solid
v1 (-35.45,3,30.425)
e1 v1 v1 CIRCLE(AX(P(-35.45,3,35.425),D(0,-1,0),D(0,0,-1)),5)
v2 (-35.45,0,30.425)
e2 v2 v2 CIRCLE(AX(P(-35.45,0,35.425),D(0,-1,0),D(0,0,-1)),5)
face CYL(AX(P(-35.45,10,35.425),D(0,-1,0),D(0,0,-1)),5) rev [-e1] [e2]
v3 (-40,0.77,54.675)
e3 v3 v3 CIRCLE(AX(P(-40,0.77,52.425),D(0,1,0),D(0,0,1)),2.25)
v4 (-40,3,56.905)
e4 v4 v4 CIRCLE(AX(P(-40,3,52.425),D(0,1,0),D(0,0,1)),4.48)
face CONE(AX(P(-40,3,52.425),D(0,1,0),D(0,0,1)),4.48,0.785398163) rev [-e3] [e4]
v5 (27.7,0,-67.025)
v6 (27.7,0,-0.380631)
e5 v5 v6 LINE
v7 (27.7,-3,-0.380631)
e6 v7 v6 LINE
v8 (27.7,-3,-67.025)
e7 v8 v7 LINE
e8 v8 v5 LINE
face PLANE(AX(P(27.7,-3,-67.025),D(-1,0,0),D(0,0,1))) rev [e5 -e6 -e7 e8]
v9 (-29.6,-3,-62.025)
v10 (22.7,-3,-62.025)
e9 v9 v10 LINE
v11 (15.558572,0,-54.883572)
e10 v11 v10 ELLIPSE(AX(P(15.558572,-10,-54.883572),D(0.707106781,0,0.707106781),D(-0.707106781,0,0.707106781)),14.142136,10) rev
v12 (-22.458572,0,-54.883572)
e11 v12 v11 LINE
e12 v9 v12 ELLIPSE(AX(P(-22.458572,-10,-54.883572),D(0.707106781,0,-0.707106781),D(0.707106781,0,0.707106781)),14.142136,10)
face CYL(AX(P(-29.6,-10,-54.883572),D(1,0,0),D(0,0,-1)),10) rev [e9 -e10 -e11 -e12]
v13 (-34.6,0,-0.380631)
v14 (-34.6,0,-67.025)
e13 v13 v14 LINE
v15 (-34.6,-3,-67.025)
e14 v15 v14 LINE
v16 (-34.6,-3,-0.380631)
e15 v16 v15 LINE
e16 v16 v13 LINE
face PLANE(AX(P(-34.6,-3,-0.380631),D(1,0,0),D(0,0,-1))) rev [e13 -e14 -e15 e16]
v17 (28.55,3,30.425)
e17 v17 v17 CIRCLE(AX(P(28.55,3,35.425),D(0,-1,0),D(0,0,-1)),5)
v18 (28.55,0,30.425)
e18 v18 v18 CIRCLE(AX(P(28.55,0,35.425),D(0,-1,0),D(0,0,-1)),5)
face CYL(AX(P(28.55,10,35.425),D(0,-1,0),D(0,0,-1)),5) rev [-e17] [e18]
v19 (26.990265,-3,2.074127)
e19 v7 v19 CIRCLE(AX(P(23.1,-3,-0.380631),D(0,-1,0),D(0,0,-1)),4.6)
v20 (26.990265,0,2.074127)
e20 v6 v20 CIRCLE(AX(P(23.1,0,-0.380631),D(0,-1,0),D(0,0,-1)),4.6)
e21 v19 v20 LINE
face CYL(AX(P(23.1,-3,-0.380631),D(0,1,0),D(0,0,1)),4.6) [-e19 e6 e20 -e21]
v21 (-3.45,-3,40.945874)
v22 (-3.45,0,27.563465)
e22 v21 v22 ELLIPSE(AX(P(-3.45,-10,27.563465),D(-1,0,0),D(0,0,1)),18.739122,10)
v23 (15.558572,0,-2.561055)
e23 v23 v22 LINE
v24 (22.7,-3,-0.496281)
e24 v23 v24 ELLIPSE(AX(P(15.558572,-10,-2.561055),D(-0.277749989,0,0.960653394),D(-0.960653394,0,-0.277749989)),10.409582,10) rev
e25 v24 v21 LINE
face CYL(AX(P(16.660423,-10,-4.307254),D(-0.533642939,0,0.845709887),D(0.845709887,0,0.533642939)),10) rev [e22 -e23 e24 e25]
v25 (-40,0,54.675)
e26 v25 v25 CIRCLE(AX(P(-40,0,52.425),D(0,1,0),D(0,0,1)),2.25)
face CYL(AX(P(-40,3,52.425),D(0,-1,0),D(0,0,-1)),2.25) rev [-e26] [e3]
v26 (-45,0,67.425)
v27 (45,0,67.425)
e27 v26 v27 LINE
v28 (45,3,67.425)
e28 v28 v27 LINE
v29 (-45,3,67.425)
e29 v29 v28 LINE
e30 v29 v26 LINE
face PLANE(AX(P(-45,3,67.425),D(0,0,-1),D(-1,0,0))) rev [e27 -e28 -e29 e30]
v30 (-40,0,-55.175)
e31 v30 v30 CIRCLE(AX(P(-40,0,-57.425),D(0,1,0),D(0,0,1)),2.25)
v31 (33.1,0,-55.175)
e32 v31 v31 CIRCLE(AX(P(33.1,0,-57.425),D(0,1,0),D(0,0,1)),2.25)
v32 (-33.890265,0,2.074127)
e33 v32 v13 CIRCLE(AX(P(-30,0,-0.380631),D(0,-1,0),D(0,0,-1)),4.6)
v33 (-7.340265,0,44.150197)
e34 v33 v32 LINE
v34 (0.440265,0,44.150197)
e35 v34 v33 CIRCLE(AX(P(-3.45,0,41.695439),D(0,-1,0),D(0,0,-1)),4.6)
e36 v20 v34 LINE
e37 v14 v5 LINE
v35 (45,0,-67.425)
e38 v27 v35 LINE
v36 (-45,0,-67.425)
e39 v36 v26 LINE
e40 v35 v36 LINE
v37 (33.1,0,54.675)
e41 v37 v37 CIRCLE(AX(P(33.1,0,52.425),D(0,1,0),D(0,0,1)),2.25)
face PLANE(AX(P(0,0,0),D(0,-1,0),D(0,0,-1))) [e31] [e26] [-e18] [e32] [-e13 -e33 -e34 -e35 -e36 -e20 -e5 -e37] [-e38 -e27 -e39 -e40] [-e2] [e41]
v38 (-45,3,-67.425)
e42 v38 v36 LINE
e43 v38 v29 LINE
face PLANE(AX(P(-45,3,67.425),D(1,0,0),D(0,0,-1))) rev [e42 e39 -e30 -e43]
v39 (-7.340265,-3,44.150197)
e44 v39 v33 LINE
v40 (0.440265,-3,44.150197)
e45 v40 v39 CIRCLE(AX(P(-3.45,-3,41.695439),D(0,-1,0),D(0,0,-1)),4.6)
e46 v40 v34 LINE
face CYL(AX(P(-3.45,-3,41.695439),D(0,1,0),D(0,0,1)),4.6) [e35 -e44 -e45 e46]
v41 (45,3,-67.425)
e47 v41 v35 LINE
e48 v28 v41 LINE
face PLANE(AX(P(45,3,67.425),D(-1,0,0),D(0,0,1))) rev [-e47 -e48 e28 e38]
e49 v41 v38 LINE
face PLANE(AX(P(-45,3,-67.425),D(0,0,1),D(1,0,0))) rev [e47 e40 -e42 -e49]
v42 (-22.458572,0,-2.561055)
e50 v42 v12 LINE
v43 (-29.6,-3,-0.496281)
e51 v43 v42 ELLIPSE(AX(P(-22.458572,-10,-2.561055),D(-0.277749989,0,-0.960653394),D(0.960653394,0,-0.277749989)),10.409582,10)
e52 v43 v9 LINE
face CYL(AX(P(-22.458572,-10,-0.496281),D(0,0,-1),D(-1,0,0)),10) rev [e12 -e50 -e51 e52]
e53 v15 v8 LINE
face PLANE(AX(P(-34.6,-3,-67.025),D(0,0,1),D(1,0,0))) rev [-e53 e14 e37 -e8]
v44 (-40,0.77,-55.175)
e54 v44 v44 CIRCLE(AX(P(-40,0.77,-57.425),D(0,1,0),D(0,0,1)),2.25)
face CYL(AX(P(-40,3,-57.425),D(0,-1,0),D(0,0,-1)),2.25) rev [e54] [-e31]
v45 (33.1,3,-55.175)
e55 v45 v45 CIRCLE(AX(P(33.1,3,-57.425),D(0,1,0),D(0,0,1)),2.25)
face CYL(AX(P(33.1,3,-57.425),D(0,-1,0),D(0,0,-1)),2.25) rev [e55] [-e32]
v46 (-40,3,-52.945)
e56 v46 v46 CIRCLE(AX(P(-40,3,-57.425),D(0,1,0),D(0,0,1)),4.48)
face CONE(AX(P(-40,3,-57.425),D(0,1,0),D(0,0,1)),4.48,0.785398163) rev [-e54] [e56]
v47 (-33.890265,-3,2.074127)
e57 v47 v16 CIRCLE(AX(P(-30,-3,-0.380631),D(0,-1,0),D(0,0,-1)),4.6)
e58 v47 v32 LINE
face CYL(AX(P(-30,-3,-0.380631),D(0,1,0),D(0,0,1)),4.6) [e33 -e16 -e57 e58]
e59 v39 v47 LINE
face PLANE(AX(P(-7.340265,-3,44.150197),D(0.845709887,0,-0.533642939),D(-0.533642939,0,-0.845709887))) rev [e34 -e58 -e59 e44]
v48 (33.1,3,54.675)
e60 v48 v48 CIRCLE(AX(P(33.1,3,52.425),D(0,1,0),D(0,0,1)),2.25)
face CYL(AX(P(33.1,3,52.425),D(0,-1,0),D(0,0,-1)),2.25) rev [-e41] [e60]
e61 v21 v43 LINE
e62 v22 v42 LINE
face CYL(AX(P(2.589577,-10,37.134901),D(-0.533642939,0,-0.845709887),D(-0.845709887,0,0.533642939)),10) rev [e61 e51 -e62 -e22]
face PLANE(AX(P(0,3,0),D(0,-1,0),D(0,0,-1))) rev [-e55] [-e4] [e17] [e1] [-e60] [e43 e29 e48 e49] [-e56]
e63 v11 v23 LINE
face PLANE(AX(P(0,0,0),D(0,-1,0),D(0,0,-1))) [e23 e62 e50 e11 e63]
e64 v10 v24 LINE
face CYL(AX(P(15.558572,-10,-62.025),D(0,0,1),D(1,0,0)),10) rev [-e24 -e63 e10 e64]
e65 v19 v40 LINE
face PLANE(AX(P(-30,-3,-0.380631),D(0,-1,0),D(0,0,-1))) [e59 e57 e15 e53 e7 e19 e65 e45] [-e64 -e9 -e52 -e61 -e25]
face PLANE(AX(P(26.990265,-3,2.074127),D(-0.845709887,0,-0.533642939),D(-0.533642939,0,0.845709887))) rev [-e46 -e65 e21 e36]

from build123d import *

# Parameters (mm, degrees)
SKETCH1_W                                            = 90
SKETCH1_H                                            = 134.85
SKETCH1_R                                            = 2.25
BOSS_EXTRUDE1_DEPTH                                  = 3
SKETCH2_R                                            = 5
CUT_EXTRUDE1_DEPTH                                   = 10
BOSS_EXTRUDE2_DEPTH                                  = 3
FILLET1_R                                            = 10
AVELLANADO_PARA_TORNILLO_TAP_N_AVELLANAD_D           = 4.5
AVELLANADO_PARA_TORNILLO_TAP_N_AVELLANAD_DEPTH       = 6
AVELLANADO_PARA_TORNILLO_TAP_N_AVELLANAD_CSINK_D     = 8.96
AVELLANADO_PARA_TORNILLO_TAP_N_AVELLANAD_CSINK_ANGLE = 90
AVELLANADO_PARA_TORNILLO_TAP_N_AVELLANAD_TIP         = 1.351936393


with BuildPart() as part:
    # Sketch1 → Boss-Extrude1 (new body)
    with BuildSketch(Plane(origin=(0, 0, 0), x_dir=(1, 0, 0), z_dir=(0, 1, 0))):
        Rectangle(SKETCH1_W, SKETCH1_H)
        with Locations(Location((-40, 57.425, 0), (0, 0, 270))):
            Circle(SKETCH1_R, mode=Mode.SUBTRACT)
        with Locations(Location((33.1, 57.425, 0), (0, 0, 270))):
            Circle(SKETCH1_R, mode=Mode.SUBTRACT)
        with Locations(Location((33.1, -52.425, 0), (0, 0, 270))):
            Circle(SKETCH1_R, mode=Mode.SUBTRACT)
        with Locations(Location((-40, -52.425, 0), (0, 0, 270))):
            Circle(SKETCH1_R, mode=Mode.SUBTRACT)
    extrude(amount=BOSS_EXTRUDE1_DEPTH)

    # Sketch2 → Cut-Extrude1 (cut)
    with BuildSketch(Plane.XZ):
        with Locations(Location((-35.45, 35.425, 0), (0, 0, 270))):
            Circle(SKETCH2_R)
        with Locations(Location((28.55, 35.425, 0), (0, 0, 270))):
            Circle(SKETCH2_R)
    extrude(amount=-CUT_EXTRUDE1_DEPTH, mode=Mode.SUBTRACT)

    # Sketch3 → Boss-Extrude2 (add)
    with BuildSketch(Plane.XZ):
        with BuildLine():
            Line((-34.6, -0.380630602), (-34.6, -67.025))
            Line((-34.6, -67.025), (27.7, -67.025))
            Line((27.7, -67.025), (27.7, -0.380630602))
            ThreePointArc((27.7, -0.380630602), (27.519005613, 0.897019347), (26.990265482, 2.074126918))
            Line((26.990265482, 2.074126918), (0.440265482, 44.150196648))
            ThreePointArc((0.440265482, 44.150196648), (-3.45, 46.295439129), (-7.340265482, 44.150196648))
            Line((-7.340265482, 44.150196648), (-33.890265482, 2.074126918))
            ThreePointArc((-33.890265482, 2.074126918), (-34.419005613, 0.897019347), (-34.6, -0.380630602))
        make_face()
        Polygon((-29.6, -0.49628105), (-29.6, -62.025), (22.7, -62.025), (22.7, -0.49628105), (-3.45, 40.945874259), align=None, mode=Mode.SUBTRACT)
    extrude(amount=BOSS_EXTRUDE2_DEPTH)

    # Fillet1
    # the kernel refuses this fillet: 10 mm, written as the material it adds along each edge
    with BuildSketch(Plane(origin=(32.227432138, 0, -15.595222631), x_dir=(0, -1, 0), z_dir=(-0.5336429389662942, 0, 0.8457098874267795))) as fillet1_piece_1_section:
        with BuildLine():
            CenterArc((10, -7.141428429), FILLET1_R, 134.427004001, 45.572995999)
            Line((0, -7.141428429), (-0.2, -7.141428429))
            Line((-0.2, -7.141428429), (-0.2, 0))
            Line((-0.2, 0), (0, 0.2))
            ThreePointArc((0, 0.2), (1.5, 0.2), (2.86, 0.142828569))
            Line((2.86, 0.142828569), (3, 0))
        make_face()
    fillet1_piece_1 = extrude(amount=84.709945498, mode=Mode.PRIVATE)
    fillet1_piece_1 = split(fillet1_piece_1, bisect_by=Plane(origin=(-18.807365912, 0, 16.607734938), z_dir=(0.8457098874267777, 0, -0.533642938966297)), keep=Keep.TOP, mode=Mode.PRIVATE)
    fillet1_piece_1 = split(fillet1_piece_1, bisect_by=Plane(origin=(22.7, 0, -15.595222631), z_dir=(-1, 0, 0)), keep=Keep.TOP, mode=Mode.PRIVATE)
    add(fillet1_piece_1)
    with BuildSketch(Plane(origin=(22.7, 0, -62.025), x_dir=(0, -1, 0), z_dir=(0, 0, 1))) as fillet1_piece_2_section:
        with BuildLine():
            CenterArc((10, -7.141428429), FILLET1_R, 134.427004001, 45.572995999)
            Line((0, -7.141428429), (-0.2, -7.141428429))
            Line((-0.2, -7.141428429), (-0.2, 0))
            Line((-0.2, 0), (0, 0.2))
            ThreePointArc((0, 0.2), (1.5, 0.2), (2.86, 0.142828569))
            Line((2.86, 0.142828569), (3, 0))
        make_face()
    fillet1_piece_2 = extrude(amount=79.382290022, mode=Mode.PRIVATE)
    fillet1_piece_2 = split(fillet1_piece_2, bisect_by=Plane(origin=(50.468348322, 0, -44.503172209), z_dir=(-0.8457098874267795, 0, -0.5336429389662942)), keep=Keep.TOP, mode=Mode.PRIVATE)
    add(fillet1_piece_2)
    with BuildSketch(Plane(origin=(-29.6, 0, -62.025), x_dir=(0, -1, 0), z_dir=(1, 0, 0))) as fillet1_piece_3:
        with BuildLine():
            CenterArc((10, -7.141428429), FILLET1_R, 134.427004001, 45.572995999)
            Line((0, -7.141428429), (-0.2, -7.141428429))
            Line((-0.2, -7.141428429), (-0.2, 0))
            Line((-0.2, 0), (0, 0.2))
            ThreePointArc((0, 0.2), (1.5, 0.2), (2.86, 0.142828569))
            Line((2.86, 0.142828569), (3, 0))
        make_face()
    extrude(amount=52.3)
    with BuildSketch(Plane(origin=(-29.6, 0, 17.357290022), x_dir=(0, -1, 0), z_dir=(0, 0, -1))) as fillet1_piece_4_section:
        with BuildLine():
            CenterArc((10, -7.141428429), FILLET1_R, 134.427004001, 45.572995999)
            Line((0, -7.141428429), (-0.2, -7.141428429))
            Line((-0.2, -7.141428429), (-0.2, 0))
            Line((-0.2, 0), (0, 0.2))
            ThreePointArc((0, 0.2), (1.5, 0.2), (2.86, 0.142828569))
            Line((2.86, 0.142828569), (3, 0))
        make_face()
    fillet1_piece_4 = extrude(amount=79.382290022, mode=Mode.PRIVATE)
    fillet1_piece_4 = split(fillet1_piece_4, bisect_by=Plane(origin=(-21.542556439, 0, 12.273043135), z_dir=(0.8457098874267777, 0, -0.533642938966297)), keep=Keep.TOP, mode=Mode.PRIVATE)
    add(fillet1_piece_4)
    with BuildSketch(Plane(origin=(6.077432138, 0, 56.04481584), x_dir=(0, -1, 0), z_dir=(-0.5336429389662971, 0, -0.8457098874267778))) as fillet1_piece_5_section:
        with BuildLine():
            CenterArc((10, -7.141428429), FILLET1_R, 134.427004001, 45.572995999)
            Line((0, -7.141428429), (-0.2, -7.141428429))
            Line((-0.2, -7.141428429), (-0.2, 0))
            Line((-0.2, 0), (0, 0.2))
            ThreePointArc((0, 0.2), (1.5, 0.2), (2.86, 0.142828569))
            Line((2.86, 0.142828569), (3, 0))
        make_face()
    fillet1_piece_5 = extrude(amount=84.709945498, mode=Mode.PRIVATE)
    fillet1_piece_5 = split(fillet1_piece_5, bisect_by=Plane(origin=(-7.551087235, 0, 47.445220116), z_dir=(-0.8457098874267795, 0, -0.5336429389662942)), keep=Keep.TOP, mode=Mode.PRIVATE)
    fillet1_piece_5 = split(fillet1_piece_5, bisect_by=Plane(origin=(-29.6, 0, 56.04481584), z_dir=(1, 0, 0)), keep=Keep.TOP, mode=Mode.PRIVATE)
    add(fillet1_piece_5)
    with BuildSketch(Plane(origin=(32.227432138, 0, -15.595222631), x_dir=(0, -1, 0), z_dir=(-0.5336429389662942, 0, 0.8457098874267795))) as fillet1_piece_6a_section:
        with BuildLine():
            CenterArc((10, -7.141428429), FILLET1_R, 134.427004001, 45.572995999)
            Line((0, -7.141428429), (-0.2, -7.141428429))
            Line((-0.2, -7.141428429), (-0.2, 0))
            Line((-0.2, 0), (0, 0.2))
            ThreePointArc((0, 0.2), (1.5, 0.2), (2.86, 0.142828569))
            Line((2.86, 0.142828569), (3, 0))
        make_face()
    fillet1_piece_6a = extrude(amount=84.709945498, mode=Mode.PRIVATE)
    fillet1_piece_6a = split(fillet1_piece_6a, bisect_by=Plane(origin=(22.7, 0, -15.595222631), z_dir=(1, 0, 0)), keep=Keep.TOP, mode=Mode.PRIVATE)
    with BuildSketch(Plane(origin=(22.7, 0, -62.025), x_dir=(0, -1, 0), z_dir=(0, 0, 1))) as fillet1_piece_6b_section:
        with BuildLine():
            CenterArc((10, -7.141428429), FILLET1_R, 134.427004001, 45.572995999)
            Line((0, -7.141428429), (-0.2, -7.141428429))
            Line((-0.2, -7.141428429), (-0.2, 0))
            Line((-0.2, 0), (0, 0.2))
            ThreePointArc((0, 0.2), (1.5, 0.2), (2.86, 0.142828569))
            Line((2.86, 0.142828569), (3, 0))
        make_face()
    fillet1_piece_6b = extrude(amount=79.382290022, mode=Mode.PRIVATE)
    fillet1_piece_6b = split(fillet1_piece_6b, bisect_by=Plane(origin=(50.468348322, 0, -44.503172209), z_dir=(0.8457098874267795, 0, 0.5336429389662942)), keep=Keep.TOP, mode=Mode.PRIVATE)
    fillet1_piece_6 = fillet1_piece_6a & fillet1_piece_6b
    add(fillet1_piece_6)
    with BuildSketch(Plane(origin=(6.077432138, 0, 56.04481584), x_dir=(0, -1, 0), z_dir=(-0.5336429389662971, 0, -0.8457098874267778))) as fillet1_piece_7a_section:
        with BuildLine():
            CenterArc((10, -7.141428429), FILLET1_R, 134.427004001, 45.572995999)
            Line((0, -7.141428429), (-0.2, -7.141428429))
            Line((-0.2, -7.141428429), (-0.2, 0))
            Line((-0.2, 0), (0, 0.2))
            ThreePointArc((0, 0.2), (1.5, 0.2), (2.86, 0.142828569))
            Line((2.86, 0.142828569), (3, 0))
        make_face()
    fillet1_piece_7a = extrude(amount=84.709945498, mode=Mode.PRIVATE)
    fillet1_piece_7a = split(fillet1_piece_7a, bisect_by=Plane(origin=(-7.551087235, 0, 47.445220116), z_dir=(0.8457098874267795, 0, 0.5336429389662942)), keep=Keep.TOP, mode=Mode.PRIVATE)
    with BuildSketch(Plane(origin=(32.227432138, 0, -15.595222631), x_dir=(0, -1, 0), z_dir=(-0.5336429389662942, 0, 0.8457098874267795))) as fillet1_piece_7b_section:
        with BuildLine():
            CenterArc((10, -7.141428429), FILLET1_R, 134.427004001, 45.572995999)
            Line((0, -7.141428429), (-0.2, -7.141428429))
            Line((-0.2, -7.141428429), (-0.2, 0))
            Line((-0.2, 0), (0, 0.2))
            ThreePointArc((0, 0.2), (1.5, 0.2), (2.86, 0.142828569))
            Line((2.86, 0.142828569), (3, 0))
        make_face()
    fillet1_piece_7b = extrude(amount=84.709945498, mode=Mode.PRIVATE)
    fillet1_piece_7b = split(fillet1_piece_7b, bisect_by=Plane(origin=(-18.807365912, 0, 16.607734938), z_dir=(-0.8457098874267777, 0, 0.533642938966297)), keep=Keep.TOP, mode=Mode.PRIVATE)
    fillet1_piece_7 = fillet1_piece_7a & fillet1_piece_7b
    add(fillet1_piece_7)
    with BuildSketch(Plane(origin=(22.7, 0, -79.878571071), x_dir=(0, -1, 0), z_dir=(0, 0, 1))) as fillet1_piece_8a_section:
        with BuildLine():
            CenterArc((10, -7.141428429), FILLET1_R, 134.427004001, 45.572995999)
            Line((0, -7.141428429), (-0.2, -7.141428429))
            Line((-0.2, -7.141428429), (-0.2, 0))
            Line((-0.2, 0), (0, 0.2))
            ThreePointArc((0, 0.2), (1.5, 0.2), (2.86, 0.142828569))
            Line((2.86, 0.142828569), (3, 0))
        make_face()
    fillet1_piece_8a = extrude(amount=97.235861093, mode=Mode.PRIVATE)
    fillet1_piece_8a = split(fillet1_piece_8a, bisect_by=Plane(origin=(22.7, 0, -62.025), z_dir=(0, 0, -1)), keep=Keep.TOP, mode=Mode.PRIVATE)
    with BuildSketch(Plane(origin=(-29.6, 0, -62.025), x_dir=(0, -1, 0), z_dir=(1, 0, 0))) as fillet1_piece_8b_section:
        with BuildLine():
            CenterArc((10, -7.141428429), FILLET1_R, 134.427004001, 45.572995999)
            Line((0, -7.141428429), (-0.2, -7.141428429))
            Line((-0.2, -7.141428429), (-0.2, 0))
            Line((-0.2, 0), (0, 0.2))
            ThreePointArc((0, 0.2), (1.5, 0.2), (2.86, 0.142828569))
            Line((2.86, 0.142828569), (3, 0))
        make_face()
    fillet1_piece_8b = extrude(amount=70.153571071, mode=Mode.PRIVATE)
    fillet1_piece_8b = split(fillet1_piece_8b, bisect_by=Plane(origin=(22.7, 0, -62.025), z_dir=(1, 0, 0)), keep=Keep.TOP, mode=Mode.PRIVATE)
    fillet1_piece_8 = fillet1_piece_8a & fillet1_piece_8b
    add(fillet1_piece_8)
    with BuildSketch(Plane(origin=(-47.453571071, 0, -62.025), x_dir=(0, -1, 0), z_dir=(1, 0, 0))) as fillet1_piece_9a_section:
        with BuildLine():
            CenterArc((10, -7.141428429), FILLET1_R, 134.427004001, 45.572995999)
            Line((0, -7.141428429), (-0.2, -7.141428429))
            Line((-0.2, -7.141428429), (-0.2, 0))
            Line((-0.2, 0), (0, 0.2))
            ThreePointArc((0, 0.2), (1.5, 0.2), (2.86, 0.142828569))
            Line((2.86, 0.142828569), (3, 0))
        make_face()
    fillet1_piece_9a = extrude(amount=70.153571071, mode=Mode.PRIVATE)
    fillet1_piece_9a = split(fillet1_piece_9a, bisect_by=Plane(origin=(-29.6, 0, -62.025), z_dir=(-1, 0, 0)), keep=Keep.TOP, mode=Mode.PRIVATE)
    with BuildSketch(Plane(origin=(-29.6, 0, 17.357290022), x_dir=(0, -1, 0), z_dir=(0, 0, -1))) as fillet1_piece_9b_section:
        with BuildLine():
            CenterArc((10, -7.141428429), FILLET1_R, 134.427004001, 45.572995999)
            Line((0, -7.141428429), (-0.2, -7.141428429))
            Line((-0.2, -7.141428429), (-0.2, 0))
            Line((-0.2, 0), (0, 0.2))
            ThreePointArc((0, 0.2), (1.5, 0.2), (2.86, 0.142828569))
            Line((2.86, 0.142828569), (3, 0))
        make_face()
    fillet1_piece_9b = extrude(amount=97.235861093, mode=Mode.PRIVATE)
    fillet1_piece_9b = split(fillet1_piece_9b, bisect_by=Plane(origin=(-29.6, 0, -62.025), z_dir=(0, 0, -1)), keep=Keep.TOP, mode=Mode.PRIVATE)
    fillet1_piece_9 = fillet1_piece_9a & fillet1_piece_9b
    add(fillet1_piece_9)
    with BuildSketch(Plane(origin=(6.077432138, 0, 56.04481584), x_dir=(0, -1, 0), z_dir=(-0.5336429389662971, 0, -0.8457098874267778))) as fillet1_piece_10a_section:
        with BuildLine():
            CenterArc((10, -7.141428429), FILLET1_R, 134.427004001, 45.572995999)
            Line((0, -7.141428429), (-0.2, -7.141428429))
            Line((-0.2, -7.141428429), (-0.2, 0))
            Line((-0.2, 0), (0, 0.2))
            ThreePointArc((0, 0.2), (1.5, 0.2), (2.86, 0.142828569))
            Line((2.86, 0.142828569), (3, 0))
        make_face()
    fillet1_piece_10a = extrude(amount=84.709945498, mode=Mode.PRIVATE)
    fillet1_piece_10a = split(fillet1_piece_10a, bisect_by=Plane(origin=(-29.6, 0, 56.04481584), z_dir=(-1, 0, 0)), keep=Keep.TOP, mode=Mode.PRIVATE)
    with BuildSketch(Plane(origin=(-29.6, 0, 17.357290022), x_dir=(0, -1, 0), z_dir=(0, 0, -1))) as fillet1_piece_10b_section:
        with BuildLine():
            CenterArc((10, -7.141428429), FILLET1_R, 134.427004001, 45.572995999)
            Line((0, -7.141428429), (-0.2, -7.141428429))
            Line((-0.2, -7.141428429), (-0.2, 0))
            Line((-0.2, 0), (0, 0.2))
            ThreePointArc((0, 0.2), (1.5, 0.2), (2.86, 0.142828569))
            Line((2.86, 0.142828569), (3, 0))
        make_face()
    fillet1_piece_10b = extrude(amount=79.382290022, mode=Mode.PRIVATE)
    fillet1_piece_10b = split(fillet1_piece_10b, bisect_by=Plane(origin=(-21.542556439, 0, 12.273043135), z_dir=(-0.8457098874267777, 0, 0.533642938966297)), keep=Keep.TOP, mode=Mode.PRIVATE)
    fillet1_piece_10 = fillet1_piece_10a & fillet1_piece_10b
    add(fillet1_piece_10)

    # Avellanado para tornillo tapón avellanado de clavija hexagonal de M41
    with Locations(Plane(origin=(-40, 3, 52.425), x_dir=(0, 0, 1), z_dir=(0, 1, 0))):
        with Locations((0, 0), (-109.85, 0)):
            CounterSinkHole(AVELLANADO_PARA_TORNILLO_TAP_N_AVELLANAD_D / 2, AVELLANADO_PARA_TORNILLO_TAP_N_AVELLANAD_CSINK_D / 2, depth=AVELLANADO_PARA_TORNILLO_TAP_N_AVELLANAD_DEPTH, counter_sink_angle=AVELLANADO_PARA_TORNILLO_TAP_N_AVELLANAD_CSINK_ANGLE)
            with Locations((0, 0, -(AVELLANADO_PARA_TORNILLO_TAP_N_AVELLANAD_DEPTH + AVELLANADO_PARA_TORNILLO_TAP_N_AVELLANAD_TIP / 2))):  # 118° drill point
                Cone(0, AVELLANADO_PARA_TORNILLO_TAP_N_AVELLANAD_D / 2, AVELLANADO_PARA_TORNILLO_TAP_N_AVELLANAD_TIP, mode=Mode.SUBTRACT)


solid = part.part
